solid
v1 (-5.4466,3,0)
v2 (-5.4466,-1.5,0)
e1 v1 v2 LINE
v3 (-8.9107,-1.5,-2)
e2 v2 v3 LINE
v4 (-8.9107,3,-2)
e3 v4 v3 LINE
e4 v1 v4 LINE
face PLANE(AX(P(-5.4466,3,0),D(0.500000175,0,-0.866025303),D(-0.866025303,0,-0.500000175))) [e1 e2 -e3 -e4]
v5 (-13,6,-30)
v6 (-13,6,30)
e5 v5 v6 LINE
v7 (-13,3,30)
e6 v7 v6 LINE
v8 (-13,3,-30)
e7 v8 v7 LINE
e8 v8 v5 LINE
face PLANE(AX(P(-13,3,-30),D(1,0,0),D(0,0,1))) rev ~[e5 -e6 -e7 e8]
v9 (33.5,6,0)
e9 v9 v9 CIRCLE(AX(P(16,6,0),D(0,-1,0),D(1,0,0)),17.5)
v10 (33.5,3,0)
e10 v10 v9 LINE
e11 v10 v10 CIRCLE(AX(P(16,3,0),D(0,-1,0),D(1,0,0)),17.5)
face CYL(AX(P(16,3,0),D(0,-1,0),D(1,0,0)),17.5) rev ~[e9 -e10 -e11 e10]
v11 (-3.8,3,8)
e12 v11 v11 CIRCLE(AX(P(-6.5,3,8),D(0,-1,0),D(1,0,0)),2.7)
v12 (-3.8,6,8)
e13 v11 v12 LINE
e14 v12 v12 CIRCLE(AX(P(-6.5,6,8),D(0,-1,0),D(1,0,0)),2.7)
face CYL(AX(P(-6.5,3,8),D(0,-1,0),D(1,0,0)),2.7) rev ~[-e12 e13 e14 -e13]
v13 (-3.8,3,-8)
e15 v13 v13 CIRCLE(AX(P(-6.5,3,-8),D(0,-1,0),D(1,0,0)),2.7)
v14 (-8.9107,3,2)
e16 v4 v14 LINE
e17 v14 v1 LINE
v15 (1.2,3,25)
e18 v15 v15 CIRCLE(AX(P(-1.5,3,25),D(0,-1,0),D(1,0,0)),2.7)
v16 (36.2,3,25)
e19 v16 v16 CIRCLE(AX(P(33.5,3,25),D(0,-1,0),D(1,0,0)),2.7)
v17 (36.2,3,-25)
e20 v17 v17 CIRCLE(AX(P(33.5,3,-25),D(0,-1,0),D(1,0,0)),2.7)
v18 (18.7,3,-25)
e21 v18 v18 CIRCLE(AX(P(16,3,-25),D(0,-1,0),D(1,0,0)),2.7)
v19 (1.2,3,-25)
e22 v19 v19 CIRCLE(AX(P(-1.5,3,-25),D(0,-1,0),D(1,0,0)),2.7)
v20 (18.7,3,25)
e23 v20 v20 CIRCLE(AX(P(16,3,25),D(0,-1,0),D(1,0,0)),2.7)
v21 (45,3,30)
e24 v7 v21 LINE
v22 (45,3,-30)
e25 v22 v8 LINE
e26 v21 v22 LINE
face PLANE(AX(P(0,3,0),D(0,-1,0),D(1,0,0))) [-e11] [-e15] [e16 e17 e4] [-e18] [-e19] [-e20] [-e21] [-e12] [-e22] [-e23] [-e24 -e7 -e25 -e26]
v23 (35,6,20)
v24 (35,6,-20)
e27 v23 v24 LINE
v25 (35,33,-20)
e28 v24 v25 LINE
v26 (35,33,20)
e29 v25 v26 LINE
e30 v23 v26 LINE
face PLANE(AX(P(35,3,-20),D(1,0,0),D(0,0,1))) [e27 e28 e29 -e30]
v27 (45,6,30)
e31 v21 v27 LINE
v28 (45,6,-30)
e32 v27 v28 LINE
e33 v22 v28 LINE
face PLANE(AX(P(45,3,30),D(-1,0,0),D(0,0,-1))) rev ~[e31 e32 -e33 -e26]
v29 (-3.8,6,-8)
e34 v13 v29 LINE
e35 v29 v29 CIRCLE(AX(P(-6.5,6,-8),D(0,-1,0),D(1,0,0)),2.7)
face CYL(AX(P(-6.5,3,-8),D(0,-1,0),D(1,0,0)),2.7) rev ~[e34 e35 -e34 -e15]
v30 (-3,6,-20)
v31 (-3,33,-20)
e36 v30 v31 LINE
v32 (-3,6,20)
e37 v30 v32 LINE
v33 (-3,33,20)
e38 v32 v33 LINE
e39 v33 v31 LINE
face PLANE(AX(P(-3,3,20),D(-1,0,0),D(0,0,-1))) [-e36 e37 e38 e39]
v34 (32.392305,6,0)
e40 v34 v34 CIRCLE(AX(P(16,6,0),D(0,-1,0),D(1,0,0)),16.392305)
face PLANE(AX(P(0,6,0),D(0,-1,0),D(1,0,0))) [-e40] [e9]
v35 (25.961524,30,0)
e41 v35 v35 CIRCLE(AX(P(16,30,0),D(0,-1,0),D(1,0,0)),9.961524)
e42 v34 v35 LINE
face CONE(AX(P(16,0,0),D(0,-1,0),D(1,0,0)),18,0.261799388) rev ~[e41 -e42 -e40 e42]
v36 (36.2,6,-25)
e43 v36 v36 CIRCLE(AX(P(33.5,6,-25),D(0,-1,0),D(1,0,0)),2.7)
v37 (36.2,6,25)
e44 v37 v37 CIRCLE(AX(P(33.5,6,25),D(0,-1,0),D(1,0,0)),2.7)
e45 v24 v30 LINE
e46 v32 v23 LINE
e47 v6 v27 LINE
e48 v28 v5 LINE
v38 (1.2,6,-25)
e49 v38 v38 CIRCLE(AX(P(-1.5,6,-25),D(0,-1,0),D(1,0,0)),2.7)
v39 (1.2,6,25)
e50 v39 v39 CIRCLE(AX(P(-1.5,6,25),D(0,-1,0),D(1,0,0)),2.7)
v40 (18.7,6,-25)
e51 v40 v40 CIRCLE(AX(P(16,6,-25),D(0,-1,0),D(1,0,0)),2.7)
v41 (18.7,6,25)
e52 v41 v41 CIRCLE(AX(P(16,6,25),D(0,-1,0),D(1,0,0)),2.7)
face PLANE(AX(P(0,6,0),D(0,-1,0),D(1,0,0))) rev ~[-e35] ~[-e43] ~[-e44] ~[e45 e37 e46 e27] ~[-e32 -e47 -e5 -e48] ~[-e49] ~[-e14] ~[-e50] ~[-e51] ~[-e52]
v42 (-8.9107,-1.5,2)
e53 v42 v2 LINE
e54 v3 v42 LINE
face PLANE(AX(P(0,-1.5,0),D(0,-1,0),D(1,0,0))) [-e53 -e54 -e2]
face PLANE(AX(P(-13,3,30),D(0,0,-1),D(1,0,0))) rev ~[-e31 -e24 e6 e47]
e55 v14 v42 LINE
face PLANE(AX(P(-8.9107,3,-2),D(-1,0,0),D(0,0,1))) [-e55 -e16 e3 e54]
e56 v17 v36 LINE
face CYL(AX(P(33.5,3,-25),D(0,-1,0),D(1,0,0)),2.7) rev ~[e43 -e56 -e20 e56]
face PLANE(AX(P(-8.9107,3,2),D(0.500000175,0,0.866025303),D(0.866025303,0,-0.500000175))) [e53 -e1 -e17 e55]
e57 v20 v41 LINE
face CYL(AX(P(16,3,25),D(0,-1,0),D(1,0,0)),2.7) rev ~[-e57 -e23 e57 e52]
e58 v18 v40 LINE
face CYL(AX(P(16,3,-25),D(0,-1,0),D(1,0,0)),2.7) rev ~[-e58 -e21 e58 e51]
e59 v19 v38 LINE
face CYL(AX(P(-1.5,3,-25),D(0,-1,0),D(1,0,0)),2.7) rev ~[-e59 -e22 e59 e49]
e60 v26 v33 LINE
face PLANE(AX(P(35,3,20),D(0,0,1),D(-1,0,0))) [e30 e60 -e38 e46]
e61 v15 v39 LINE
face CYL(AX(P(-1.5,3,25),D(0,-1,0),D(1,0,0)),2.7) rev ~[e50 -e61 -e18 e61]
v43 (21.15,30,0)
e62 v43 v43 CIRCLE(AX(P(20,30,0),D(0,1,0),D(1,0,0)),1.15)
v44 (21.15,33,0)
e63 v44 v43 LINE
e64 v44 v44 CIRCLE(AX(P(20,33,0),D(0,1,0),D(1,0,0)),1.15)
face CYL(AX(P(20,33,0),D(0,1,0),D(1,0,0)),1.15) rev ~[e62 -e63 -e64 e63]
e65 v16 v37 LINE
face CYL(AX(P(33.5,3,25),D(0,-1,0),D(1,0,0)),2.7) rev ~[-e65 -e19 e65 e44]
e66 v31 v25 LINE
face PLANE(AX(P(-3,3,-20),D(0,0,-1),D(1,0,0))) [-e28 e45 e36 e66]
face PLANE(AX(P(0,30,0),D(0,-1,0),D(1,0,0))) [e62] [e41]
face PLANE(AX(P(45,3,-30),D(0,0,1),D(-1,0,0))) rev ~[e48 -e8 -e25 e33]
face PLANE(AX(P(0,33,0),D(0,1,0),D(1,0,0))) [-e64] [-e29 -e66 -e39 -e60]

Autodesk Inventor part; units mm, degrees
ref_plane "YZ Plane" through (0, 0, 0) normal (1, 0, 0) x (0, 1, 0)
ref_plane "XZ Plane" through (0, 0, 0) normal (0, 1, 0) x (-1, 0, 0)
ref_plane "XY Plane" through (0, 0, 0) normal (0, 0, 1) x (1, 0, 0)
ref_plane "Work Plane5" through (0, 3, 0) normal (0, 1, 0) x (1, 0, 0)
sketch "Sketch45" plane through (0, 3, 0) normal (0, 1, 0) x (1, 0, 0)
  line L0 (35, -20) -> (-3, -20)
  line L1 (-3, -20) -> (-3, 20)
  line L2 (-3, 20) -> (35, 20)
  line L3 (35, 20) -> (35, -20)
  point P0 (0, 0)
  dimension "d142" = 38
  dimension "d143" = 40
extrude "Extrusion34" add sketch "Sketch45" along normal blind 30
ref_plane "Work Plane2" through (0, 0, 0) normal (0, -1, 0) x (1, 0, 0)
sketch "Sketch47" plane through (0, 0, 0) normal (0, -1, 0) x (1, 0, 0)
  circle A0 centre (16, 0) radius 18
  point P0 (0, 0)
  dimension "d146" = 36
extrude "Extrusion35" cut sketch "Sketch47" against normal blind 30 draft -15
ref_plane "Work Plane1" through (0, 3, 0) normal (0, 1, 0) x (1, 0, 0)
sketch "Sketch74" plane through (0, 33, 0) normal (0, 1, 0) x (1, 0, 0)
  circle A0 centre (20, 0) radius 1.15
  point P0 (0, 0)
  dimension "d210" = 2.3
extrude "Extrusion51" cut sketch "Sketch74" against normal blind 10
sketch "Sketch77" plane through (0, 3, 0) normal (0, -1, 0) x (1, 0, 0)
  circle A0 centre (16, 0) radius 17.5
  point P0 (0, 0)
  dimension "d219" = 35
sketch "Sketch78" plane through (0, 3, 0) normal (0, -1, 0) x (1, 0, 0)
  line L0 (45, -30) -> (-13, -30)
  line L1 (-13, -30) -> (-13, 30)
  line L2 (-13, 30) -> (45, 30)
  line L3 (45, 30) -> (45, -30)
  line L4 (45, -30) -> (-13, 30) construction
  line L5 (-13, -30) -> (45, 30) construction
  point P0 (0, 0)
  point P1 (16, 0)
  dimension "d220" = 58
  dimension "d221" = 60
extrude "Extrusion53" add sketch "Sketch78" against normal blind 3
extrude "Extrusion54" cut sketch "Sketch77" against normal blind 3
sketch "Sketch81" plane through (0, 3, 0) normal (0, -1, 0) x (1, 0, 0)
  circle A0 centre (33.5, -25) radius 2.7
  line L0 (-13, -30) -> (45, -30) projected
  line L1 (45, -30) -> (45, 30) projected
  circle A1 centre (16, -25) radius 2.7
  circle A2 centre (-1.5, -25) radius 2.7
  circle A3 centre (-6.5, -8) radius 2.7
  circle A4 centre (-6.5, 8) radius 2.7
  circle A5 centre (-1.5, 25) radius 2.7
  circle A6 centre (16, 25) radius 2.7
  circle A7 centre (33.5, 25) radius 2.7
  point P0 (0, 0)
  dimension "mag_D" = 5.4
  dimension "d232" = 5
  dimension "d233" = 11.5
  dimension "d234" = 5.4
  dimension "d235" = 17.5
  dimension "d236" = 5.4
  dimension "d237" = 17.5
  dimension "d238" = 5.4
  dimension "d239" = 5
  dimension "d240" = 17
  dimension "d241" = 5.4
  dimension "d242" = 16
  dimension "d243" = 5.4
  dimension "d244" = 17
  dimension "d245" = 5.4
  dimension "d246" = 17.5
  dimension "d247" = 5.4
  dimension "d248" = 17.5
  dimension "d249" = 5
extrude "Extrusion56" cut sketch "Sketch81" against normal blind 30
sketch "Sketch83" plane through (0, 3, 0) normal (0, -1, 0) x (1, 0, 0)
  circle A0 centre (-6.5, -8) radius 2.7 projected
  line L0 (-8.9107, -2) -> (-8.9107, 2)
  line L1 (-8.9107, 2) -> (-5.4466, 0)
  line L2 (-5.4466, 0) -> (-8.9107, -2)
  point P0 (0, 0)
  point P1 (-8.9107, -9.2159)
  point P2 (-7.756, 0)
  dimension "d253" = 4
extrude "Extrusion57" add sketch "Sketch83" along normal blind 4.5 contours L0 L1 L2
equation "\"d234\" = mag_D"
equation "\"d236\" = mag_D"
equation "\"d237\" = d235"
equation "\"d238\" = mag_D"
equation "\"d241\" = mag_D"
equation "\"d243\" = mag_D"
equation "\"d244\" = d240"
equation "\"d245\" = mag_D"
equation "\"d246\" = d235"
equation "\"d247\" = mag_D"
equation "\"d248\" = d235"
equation "\"d249\" = d239"
properties part number "liquid_port_v04"
